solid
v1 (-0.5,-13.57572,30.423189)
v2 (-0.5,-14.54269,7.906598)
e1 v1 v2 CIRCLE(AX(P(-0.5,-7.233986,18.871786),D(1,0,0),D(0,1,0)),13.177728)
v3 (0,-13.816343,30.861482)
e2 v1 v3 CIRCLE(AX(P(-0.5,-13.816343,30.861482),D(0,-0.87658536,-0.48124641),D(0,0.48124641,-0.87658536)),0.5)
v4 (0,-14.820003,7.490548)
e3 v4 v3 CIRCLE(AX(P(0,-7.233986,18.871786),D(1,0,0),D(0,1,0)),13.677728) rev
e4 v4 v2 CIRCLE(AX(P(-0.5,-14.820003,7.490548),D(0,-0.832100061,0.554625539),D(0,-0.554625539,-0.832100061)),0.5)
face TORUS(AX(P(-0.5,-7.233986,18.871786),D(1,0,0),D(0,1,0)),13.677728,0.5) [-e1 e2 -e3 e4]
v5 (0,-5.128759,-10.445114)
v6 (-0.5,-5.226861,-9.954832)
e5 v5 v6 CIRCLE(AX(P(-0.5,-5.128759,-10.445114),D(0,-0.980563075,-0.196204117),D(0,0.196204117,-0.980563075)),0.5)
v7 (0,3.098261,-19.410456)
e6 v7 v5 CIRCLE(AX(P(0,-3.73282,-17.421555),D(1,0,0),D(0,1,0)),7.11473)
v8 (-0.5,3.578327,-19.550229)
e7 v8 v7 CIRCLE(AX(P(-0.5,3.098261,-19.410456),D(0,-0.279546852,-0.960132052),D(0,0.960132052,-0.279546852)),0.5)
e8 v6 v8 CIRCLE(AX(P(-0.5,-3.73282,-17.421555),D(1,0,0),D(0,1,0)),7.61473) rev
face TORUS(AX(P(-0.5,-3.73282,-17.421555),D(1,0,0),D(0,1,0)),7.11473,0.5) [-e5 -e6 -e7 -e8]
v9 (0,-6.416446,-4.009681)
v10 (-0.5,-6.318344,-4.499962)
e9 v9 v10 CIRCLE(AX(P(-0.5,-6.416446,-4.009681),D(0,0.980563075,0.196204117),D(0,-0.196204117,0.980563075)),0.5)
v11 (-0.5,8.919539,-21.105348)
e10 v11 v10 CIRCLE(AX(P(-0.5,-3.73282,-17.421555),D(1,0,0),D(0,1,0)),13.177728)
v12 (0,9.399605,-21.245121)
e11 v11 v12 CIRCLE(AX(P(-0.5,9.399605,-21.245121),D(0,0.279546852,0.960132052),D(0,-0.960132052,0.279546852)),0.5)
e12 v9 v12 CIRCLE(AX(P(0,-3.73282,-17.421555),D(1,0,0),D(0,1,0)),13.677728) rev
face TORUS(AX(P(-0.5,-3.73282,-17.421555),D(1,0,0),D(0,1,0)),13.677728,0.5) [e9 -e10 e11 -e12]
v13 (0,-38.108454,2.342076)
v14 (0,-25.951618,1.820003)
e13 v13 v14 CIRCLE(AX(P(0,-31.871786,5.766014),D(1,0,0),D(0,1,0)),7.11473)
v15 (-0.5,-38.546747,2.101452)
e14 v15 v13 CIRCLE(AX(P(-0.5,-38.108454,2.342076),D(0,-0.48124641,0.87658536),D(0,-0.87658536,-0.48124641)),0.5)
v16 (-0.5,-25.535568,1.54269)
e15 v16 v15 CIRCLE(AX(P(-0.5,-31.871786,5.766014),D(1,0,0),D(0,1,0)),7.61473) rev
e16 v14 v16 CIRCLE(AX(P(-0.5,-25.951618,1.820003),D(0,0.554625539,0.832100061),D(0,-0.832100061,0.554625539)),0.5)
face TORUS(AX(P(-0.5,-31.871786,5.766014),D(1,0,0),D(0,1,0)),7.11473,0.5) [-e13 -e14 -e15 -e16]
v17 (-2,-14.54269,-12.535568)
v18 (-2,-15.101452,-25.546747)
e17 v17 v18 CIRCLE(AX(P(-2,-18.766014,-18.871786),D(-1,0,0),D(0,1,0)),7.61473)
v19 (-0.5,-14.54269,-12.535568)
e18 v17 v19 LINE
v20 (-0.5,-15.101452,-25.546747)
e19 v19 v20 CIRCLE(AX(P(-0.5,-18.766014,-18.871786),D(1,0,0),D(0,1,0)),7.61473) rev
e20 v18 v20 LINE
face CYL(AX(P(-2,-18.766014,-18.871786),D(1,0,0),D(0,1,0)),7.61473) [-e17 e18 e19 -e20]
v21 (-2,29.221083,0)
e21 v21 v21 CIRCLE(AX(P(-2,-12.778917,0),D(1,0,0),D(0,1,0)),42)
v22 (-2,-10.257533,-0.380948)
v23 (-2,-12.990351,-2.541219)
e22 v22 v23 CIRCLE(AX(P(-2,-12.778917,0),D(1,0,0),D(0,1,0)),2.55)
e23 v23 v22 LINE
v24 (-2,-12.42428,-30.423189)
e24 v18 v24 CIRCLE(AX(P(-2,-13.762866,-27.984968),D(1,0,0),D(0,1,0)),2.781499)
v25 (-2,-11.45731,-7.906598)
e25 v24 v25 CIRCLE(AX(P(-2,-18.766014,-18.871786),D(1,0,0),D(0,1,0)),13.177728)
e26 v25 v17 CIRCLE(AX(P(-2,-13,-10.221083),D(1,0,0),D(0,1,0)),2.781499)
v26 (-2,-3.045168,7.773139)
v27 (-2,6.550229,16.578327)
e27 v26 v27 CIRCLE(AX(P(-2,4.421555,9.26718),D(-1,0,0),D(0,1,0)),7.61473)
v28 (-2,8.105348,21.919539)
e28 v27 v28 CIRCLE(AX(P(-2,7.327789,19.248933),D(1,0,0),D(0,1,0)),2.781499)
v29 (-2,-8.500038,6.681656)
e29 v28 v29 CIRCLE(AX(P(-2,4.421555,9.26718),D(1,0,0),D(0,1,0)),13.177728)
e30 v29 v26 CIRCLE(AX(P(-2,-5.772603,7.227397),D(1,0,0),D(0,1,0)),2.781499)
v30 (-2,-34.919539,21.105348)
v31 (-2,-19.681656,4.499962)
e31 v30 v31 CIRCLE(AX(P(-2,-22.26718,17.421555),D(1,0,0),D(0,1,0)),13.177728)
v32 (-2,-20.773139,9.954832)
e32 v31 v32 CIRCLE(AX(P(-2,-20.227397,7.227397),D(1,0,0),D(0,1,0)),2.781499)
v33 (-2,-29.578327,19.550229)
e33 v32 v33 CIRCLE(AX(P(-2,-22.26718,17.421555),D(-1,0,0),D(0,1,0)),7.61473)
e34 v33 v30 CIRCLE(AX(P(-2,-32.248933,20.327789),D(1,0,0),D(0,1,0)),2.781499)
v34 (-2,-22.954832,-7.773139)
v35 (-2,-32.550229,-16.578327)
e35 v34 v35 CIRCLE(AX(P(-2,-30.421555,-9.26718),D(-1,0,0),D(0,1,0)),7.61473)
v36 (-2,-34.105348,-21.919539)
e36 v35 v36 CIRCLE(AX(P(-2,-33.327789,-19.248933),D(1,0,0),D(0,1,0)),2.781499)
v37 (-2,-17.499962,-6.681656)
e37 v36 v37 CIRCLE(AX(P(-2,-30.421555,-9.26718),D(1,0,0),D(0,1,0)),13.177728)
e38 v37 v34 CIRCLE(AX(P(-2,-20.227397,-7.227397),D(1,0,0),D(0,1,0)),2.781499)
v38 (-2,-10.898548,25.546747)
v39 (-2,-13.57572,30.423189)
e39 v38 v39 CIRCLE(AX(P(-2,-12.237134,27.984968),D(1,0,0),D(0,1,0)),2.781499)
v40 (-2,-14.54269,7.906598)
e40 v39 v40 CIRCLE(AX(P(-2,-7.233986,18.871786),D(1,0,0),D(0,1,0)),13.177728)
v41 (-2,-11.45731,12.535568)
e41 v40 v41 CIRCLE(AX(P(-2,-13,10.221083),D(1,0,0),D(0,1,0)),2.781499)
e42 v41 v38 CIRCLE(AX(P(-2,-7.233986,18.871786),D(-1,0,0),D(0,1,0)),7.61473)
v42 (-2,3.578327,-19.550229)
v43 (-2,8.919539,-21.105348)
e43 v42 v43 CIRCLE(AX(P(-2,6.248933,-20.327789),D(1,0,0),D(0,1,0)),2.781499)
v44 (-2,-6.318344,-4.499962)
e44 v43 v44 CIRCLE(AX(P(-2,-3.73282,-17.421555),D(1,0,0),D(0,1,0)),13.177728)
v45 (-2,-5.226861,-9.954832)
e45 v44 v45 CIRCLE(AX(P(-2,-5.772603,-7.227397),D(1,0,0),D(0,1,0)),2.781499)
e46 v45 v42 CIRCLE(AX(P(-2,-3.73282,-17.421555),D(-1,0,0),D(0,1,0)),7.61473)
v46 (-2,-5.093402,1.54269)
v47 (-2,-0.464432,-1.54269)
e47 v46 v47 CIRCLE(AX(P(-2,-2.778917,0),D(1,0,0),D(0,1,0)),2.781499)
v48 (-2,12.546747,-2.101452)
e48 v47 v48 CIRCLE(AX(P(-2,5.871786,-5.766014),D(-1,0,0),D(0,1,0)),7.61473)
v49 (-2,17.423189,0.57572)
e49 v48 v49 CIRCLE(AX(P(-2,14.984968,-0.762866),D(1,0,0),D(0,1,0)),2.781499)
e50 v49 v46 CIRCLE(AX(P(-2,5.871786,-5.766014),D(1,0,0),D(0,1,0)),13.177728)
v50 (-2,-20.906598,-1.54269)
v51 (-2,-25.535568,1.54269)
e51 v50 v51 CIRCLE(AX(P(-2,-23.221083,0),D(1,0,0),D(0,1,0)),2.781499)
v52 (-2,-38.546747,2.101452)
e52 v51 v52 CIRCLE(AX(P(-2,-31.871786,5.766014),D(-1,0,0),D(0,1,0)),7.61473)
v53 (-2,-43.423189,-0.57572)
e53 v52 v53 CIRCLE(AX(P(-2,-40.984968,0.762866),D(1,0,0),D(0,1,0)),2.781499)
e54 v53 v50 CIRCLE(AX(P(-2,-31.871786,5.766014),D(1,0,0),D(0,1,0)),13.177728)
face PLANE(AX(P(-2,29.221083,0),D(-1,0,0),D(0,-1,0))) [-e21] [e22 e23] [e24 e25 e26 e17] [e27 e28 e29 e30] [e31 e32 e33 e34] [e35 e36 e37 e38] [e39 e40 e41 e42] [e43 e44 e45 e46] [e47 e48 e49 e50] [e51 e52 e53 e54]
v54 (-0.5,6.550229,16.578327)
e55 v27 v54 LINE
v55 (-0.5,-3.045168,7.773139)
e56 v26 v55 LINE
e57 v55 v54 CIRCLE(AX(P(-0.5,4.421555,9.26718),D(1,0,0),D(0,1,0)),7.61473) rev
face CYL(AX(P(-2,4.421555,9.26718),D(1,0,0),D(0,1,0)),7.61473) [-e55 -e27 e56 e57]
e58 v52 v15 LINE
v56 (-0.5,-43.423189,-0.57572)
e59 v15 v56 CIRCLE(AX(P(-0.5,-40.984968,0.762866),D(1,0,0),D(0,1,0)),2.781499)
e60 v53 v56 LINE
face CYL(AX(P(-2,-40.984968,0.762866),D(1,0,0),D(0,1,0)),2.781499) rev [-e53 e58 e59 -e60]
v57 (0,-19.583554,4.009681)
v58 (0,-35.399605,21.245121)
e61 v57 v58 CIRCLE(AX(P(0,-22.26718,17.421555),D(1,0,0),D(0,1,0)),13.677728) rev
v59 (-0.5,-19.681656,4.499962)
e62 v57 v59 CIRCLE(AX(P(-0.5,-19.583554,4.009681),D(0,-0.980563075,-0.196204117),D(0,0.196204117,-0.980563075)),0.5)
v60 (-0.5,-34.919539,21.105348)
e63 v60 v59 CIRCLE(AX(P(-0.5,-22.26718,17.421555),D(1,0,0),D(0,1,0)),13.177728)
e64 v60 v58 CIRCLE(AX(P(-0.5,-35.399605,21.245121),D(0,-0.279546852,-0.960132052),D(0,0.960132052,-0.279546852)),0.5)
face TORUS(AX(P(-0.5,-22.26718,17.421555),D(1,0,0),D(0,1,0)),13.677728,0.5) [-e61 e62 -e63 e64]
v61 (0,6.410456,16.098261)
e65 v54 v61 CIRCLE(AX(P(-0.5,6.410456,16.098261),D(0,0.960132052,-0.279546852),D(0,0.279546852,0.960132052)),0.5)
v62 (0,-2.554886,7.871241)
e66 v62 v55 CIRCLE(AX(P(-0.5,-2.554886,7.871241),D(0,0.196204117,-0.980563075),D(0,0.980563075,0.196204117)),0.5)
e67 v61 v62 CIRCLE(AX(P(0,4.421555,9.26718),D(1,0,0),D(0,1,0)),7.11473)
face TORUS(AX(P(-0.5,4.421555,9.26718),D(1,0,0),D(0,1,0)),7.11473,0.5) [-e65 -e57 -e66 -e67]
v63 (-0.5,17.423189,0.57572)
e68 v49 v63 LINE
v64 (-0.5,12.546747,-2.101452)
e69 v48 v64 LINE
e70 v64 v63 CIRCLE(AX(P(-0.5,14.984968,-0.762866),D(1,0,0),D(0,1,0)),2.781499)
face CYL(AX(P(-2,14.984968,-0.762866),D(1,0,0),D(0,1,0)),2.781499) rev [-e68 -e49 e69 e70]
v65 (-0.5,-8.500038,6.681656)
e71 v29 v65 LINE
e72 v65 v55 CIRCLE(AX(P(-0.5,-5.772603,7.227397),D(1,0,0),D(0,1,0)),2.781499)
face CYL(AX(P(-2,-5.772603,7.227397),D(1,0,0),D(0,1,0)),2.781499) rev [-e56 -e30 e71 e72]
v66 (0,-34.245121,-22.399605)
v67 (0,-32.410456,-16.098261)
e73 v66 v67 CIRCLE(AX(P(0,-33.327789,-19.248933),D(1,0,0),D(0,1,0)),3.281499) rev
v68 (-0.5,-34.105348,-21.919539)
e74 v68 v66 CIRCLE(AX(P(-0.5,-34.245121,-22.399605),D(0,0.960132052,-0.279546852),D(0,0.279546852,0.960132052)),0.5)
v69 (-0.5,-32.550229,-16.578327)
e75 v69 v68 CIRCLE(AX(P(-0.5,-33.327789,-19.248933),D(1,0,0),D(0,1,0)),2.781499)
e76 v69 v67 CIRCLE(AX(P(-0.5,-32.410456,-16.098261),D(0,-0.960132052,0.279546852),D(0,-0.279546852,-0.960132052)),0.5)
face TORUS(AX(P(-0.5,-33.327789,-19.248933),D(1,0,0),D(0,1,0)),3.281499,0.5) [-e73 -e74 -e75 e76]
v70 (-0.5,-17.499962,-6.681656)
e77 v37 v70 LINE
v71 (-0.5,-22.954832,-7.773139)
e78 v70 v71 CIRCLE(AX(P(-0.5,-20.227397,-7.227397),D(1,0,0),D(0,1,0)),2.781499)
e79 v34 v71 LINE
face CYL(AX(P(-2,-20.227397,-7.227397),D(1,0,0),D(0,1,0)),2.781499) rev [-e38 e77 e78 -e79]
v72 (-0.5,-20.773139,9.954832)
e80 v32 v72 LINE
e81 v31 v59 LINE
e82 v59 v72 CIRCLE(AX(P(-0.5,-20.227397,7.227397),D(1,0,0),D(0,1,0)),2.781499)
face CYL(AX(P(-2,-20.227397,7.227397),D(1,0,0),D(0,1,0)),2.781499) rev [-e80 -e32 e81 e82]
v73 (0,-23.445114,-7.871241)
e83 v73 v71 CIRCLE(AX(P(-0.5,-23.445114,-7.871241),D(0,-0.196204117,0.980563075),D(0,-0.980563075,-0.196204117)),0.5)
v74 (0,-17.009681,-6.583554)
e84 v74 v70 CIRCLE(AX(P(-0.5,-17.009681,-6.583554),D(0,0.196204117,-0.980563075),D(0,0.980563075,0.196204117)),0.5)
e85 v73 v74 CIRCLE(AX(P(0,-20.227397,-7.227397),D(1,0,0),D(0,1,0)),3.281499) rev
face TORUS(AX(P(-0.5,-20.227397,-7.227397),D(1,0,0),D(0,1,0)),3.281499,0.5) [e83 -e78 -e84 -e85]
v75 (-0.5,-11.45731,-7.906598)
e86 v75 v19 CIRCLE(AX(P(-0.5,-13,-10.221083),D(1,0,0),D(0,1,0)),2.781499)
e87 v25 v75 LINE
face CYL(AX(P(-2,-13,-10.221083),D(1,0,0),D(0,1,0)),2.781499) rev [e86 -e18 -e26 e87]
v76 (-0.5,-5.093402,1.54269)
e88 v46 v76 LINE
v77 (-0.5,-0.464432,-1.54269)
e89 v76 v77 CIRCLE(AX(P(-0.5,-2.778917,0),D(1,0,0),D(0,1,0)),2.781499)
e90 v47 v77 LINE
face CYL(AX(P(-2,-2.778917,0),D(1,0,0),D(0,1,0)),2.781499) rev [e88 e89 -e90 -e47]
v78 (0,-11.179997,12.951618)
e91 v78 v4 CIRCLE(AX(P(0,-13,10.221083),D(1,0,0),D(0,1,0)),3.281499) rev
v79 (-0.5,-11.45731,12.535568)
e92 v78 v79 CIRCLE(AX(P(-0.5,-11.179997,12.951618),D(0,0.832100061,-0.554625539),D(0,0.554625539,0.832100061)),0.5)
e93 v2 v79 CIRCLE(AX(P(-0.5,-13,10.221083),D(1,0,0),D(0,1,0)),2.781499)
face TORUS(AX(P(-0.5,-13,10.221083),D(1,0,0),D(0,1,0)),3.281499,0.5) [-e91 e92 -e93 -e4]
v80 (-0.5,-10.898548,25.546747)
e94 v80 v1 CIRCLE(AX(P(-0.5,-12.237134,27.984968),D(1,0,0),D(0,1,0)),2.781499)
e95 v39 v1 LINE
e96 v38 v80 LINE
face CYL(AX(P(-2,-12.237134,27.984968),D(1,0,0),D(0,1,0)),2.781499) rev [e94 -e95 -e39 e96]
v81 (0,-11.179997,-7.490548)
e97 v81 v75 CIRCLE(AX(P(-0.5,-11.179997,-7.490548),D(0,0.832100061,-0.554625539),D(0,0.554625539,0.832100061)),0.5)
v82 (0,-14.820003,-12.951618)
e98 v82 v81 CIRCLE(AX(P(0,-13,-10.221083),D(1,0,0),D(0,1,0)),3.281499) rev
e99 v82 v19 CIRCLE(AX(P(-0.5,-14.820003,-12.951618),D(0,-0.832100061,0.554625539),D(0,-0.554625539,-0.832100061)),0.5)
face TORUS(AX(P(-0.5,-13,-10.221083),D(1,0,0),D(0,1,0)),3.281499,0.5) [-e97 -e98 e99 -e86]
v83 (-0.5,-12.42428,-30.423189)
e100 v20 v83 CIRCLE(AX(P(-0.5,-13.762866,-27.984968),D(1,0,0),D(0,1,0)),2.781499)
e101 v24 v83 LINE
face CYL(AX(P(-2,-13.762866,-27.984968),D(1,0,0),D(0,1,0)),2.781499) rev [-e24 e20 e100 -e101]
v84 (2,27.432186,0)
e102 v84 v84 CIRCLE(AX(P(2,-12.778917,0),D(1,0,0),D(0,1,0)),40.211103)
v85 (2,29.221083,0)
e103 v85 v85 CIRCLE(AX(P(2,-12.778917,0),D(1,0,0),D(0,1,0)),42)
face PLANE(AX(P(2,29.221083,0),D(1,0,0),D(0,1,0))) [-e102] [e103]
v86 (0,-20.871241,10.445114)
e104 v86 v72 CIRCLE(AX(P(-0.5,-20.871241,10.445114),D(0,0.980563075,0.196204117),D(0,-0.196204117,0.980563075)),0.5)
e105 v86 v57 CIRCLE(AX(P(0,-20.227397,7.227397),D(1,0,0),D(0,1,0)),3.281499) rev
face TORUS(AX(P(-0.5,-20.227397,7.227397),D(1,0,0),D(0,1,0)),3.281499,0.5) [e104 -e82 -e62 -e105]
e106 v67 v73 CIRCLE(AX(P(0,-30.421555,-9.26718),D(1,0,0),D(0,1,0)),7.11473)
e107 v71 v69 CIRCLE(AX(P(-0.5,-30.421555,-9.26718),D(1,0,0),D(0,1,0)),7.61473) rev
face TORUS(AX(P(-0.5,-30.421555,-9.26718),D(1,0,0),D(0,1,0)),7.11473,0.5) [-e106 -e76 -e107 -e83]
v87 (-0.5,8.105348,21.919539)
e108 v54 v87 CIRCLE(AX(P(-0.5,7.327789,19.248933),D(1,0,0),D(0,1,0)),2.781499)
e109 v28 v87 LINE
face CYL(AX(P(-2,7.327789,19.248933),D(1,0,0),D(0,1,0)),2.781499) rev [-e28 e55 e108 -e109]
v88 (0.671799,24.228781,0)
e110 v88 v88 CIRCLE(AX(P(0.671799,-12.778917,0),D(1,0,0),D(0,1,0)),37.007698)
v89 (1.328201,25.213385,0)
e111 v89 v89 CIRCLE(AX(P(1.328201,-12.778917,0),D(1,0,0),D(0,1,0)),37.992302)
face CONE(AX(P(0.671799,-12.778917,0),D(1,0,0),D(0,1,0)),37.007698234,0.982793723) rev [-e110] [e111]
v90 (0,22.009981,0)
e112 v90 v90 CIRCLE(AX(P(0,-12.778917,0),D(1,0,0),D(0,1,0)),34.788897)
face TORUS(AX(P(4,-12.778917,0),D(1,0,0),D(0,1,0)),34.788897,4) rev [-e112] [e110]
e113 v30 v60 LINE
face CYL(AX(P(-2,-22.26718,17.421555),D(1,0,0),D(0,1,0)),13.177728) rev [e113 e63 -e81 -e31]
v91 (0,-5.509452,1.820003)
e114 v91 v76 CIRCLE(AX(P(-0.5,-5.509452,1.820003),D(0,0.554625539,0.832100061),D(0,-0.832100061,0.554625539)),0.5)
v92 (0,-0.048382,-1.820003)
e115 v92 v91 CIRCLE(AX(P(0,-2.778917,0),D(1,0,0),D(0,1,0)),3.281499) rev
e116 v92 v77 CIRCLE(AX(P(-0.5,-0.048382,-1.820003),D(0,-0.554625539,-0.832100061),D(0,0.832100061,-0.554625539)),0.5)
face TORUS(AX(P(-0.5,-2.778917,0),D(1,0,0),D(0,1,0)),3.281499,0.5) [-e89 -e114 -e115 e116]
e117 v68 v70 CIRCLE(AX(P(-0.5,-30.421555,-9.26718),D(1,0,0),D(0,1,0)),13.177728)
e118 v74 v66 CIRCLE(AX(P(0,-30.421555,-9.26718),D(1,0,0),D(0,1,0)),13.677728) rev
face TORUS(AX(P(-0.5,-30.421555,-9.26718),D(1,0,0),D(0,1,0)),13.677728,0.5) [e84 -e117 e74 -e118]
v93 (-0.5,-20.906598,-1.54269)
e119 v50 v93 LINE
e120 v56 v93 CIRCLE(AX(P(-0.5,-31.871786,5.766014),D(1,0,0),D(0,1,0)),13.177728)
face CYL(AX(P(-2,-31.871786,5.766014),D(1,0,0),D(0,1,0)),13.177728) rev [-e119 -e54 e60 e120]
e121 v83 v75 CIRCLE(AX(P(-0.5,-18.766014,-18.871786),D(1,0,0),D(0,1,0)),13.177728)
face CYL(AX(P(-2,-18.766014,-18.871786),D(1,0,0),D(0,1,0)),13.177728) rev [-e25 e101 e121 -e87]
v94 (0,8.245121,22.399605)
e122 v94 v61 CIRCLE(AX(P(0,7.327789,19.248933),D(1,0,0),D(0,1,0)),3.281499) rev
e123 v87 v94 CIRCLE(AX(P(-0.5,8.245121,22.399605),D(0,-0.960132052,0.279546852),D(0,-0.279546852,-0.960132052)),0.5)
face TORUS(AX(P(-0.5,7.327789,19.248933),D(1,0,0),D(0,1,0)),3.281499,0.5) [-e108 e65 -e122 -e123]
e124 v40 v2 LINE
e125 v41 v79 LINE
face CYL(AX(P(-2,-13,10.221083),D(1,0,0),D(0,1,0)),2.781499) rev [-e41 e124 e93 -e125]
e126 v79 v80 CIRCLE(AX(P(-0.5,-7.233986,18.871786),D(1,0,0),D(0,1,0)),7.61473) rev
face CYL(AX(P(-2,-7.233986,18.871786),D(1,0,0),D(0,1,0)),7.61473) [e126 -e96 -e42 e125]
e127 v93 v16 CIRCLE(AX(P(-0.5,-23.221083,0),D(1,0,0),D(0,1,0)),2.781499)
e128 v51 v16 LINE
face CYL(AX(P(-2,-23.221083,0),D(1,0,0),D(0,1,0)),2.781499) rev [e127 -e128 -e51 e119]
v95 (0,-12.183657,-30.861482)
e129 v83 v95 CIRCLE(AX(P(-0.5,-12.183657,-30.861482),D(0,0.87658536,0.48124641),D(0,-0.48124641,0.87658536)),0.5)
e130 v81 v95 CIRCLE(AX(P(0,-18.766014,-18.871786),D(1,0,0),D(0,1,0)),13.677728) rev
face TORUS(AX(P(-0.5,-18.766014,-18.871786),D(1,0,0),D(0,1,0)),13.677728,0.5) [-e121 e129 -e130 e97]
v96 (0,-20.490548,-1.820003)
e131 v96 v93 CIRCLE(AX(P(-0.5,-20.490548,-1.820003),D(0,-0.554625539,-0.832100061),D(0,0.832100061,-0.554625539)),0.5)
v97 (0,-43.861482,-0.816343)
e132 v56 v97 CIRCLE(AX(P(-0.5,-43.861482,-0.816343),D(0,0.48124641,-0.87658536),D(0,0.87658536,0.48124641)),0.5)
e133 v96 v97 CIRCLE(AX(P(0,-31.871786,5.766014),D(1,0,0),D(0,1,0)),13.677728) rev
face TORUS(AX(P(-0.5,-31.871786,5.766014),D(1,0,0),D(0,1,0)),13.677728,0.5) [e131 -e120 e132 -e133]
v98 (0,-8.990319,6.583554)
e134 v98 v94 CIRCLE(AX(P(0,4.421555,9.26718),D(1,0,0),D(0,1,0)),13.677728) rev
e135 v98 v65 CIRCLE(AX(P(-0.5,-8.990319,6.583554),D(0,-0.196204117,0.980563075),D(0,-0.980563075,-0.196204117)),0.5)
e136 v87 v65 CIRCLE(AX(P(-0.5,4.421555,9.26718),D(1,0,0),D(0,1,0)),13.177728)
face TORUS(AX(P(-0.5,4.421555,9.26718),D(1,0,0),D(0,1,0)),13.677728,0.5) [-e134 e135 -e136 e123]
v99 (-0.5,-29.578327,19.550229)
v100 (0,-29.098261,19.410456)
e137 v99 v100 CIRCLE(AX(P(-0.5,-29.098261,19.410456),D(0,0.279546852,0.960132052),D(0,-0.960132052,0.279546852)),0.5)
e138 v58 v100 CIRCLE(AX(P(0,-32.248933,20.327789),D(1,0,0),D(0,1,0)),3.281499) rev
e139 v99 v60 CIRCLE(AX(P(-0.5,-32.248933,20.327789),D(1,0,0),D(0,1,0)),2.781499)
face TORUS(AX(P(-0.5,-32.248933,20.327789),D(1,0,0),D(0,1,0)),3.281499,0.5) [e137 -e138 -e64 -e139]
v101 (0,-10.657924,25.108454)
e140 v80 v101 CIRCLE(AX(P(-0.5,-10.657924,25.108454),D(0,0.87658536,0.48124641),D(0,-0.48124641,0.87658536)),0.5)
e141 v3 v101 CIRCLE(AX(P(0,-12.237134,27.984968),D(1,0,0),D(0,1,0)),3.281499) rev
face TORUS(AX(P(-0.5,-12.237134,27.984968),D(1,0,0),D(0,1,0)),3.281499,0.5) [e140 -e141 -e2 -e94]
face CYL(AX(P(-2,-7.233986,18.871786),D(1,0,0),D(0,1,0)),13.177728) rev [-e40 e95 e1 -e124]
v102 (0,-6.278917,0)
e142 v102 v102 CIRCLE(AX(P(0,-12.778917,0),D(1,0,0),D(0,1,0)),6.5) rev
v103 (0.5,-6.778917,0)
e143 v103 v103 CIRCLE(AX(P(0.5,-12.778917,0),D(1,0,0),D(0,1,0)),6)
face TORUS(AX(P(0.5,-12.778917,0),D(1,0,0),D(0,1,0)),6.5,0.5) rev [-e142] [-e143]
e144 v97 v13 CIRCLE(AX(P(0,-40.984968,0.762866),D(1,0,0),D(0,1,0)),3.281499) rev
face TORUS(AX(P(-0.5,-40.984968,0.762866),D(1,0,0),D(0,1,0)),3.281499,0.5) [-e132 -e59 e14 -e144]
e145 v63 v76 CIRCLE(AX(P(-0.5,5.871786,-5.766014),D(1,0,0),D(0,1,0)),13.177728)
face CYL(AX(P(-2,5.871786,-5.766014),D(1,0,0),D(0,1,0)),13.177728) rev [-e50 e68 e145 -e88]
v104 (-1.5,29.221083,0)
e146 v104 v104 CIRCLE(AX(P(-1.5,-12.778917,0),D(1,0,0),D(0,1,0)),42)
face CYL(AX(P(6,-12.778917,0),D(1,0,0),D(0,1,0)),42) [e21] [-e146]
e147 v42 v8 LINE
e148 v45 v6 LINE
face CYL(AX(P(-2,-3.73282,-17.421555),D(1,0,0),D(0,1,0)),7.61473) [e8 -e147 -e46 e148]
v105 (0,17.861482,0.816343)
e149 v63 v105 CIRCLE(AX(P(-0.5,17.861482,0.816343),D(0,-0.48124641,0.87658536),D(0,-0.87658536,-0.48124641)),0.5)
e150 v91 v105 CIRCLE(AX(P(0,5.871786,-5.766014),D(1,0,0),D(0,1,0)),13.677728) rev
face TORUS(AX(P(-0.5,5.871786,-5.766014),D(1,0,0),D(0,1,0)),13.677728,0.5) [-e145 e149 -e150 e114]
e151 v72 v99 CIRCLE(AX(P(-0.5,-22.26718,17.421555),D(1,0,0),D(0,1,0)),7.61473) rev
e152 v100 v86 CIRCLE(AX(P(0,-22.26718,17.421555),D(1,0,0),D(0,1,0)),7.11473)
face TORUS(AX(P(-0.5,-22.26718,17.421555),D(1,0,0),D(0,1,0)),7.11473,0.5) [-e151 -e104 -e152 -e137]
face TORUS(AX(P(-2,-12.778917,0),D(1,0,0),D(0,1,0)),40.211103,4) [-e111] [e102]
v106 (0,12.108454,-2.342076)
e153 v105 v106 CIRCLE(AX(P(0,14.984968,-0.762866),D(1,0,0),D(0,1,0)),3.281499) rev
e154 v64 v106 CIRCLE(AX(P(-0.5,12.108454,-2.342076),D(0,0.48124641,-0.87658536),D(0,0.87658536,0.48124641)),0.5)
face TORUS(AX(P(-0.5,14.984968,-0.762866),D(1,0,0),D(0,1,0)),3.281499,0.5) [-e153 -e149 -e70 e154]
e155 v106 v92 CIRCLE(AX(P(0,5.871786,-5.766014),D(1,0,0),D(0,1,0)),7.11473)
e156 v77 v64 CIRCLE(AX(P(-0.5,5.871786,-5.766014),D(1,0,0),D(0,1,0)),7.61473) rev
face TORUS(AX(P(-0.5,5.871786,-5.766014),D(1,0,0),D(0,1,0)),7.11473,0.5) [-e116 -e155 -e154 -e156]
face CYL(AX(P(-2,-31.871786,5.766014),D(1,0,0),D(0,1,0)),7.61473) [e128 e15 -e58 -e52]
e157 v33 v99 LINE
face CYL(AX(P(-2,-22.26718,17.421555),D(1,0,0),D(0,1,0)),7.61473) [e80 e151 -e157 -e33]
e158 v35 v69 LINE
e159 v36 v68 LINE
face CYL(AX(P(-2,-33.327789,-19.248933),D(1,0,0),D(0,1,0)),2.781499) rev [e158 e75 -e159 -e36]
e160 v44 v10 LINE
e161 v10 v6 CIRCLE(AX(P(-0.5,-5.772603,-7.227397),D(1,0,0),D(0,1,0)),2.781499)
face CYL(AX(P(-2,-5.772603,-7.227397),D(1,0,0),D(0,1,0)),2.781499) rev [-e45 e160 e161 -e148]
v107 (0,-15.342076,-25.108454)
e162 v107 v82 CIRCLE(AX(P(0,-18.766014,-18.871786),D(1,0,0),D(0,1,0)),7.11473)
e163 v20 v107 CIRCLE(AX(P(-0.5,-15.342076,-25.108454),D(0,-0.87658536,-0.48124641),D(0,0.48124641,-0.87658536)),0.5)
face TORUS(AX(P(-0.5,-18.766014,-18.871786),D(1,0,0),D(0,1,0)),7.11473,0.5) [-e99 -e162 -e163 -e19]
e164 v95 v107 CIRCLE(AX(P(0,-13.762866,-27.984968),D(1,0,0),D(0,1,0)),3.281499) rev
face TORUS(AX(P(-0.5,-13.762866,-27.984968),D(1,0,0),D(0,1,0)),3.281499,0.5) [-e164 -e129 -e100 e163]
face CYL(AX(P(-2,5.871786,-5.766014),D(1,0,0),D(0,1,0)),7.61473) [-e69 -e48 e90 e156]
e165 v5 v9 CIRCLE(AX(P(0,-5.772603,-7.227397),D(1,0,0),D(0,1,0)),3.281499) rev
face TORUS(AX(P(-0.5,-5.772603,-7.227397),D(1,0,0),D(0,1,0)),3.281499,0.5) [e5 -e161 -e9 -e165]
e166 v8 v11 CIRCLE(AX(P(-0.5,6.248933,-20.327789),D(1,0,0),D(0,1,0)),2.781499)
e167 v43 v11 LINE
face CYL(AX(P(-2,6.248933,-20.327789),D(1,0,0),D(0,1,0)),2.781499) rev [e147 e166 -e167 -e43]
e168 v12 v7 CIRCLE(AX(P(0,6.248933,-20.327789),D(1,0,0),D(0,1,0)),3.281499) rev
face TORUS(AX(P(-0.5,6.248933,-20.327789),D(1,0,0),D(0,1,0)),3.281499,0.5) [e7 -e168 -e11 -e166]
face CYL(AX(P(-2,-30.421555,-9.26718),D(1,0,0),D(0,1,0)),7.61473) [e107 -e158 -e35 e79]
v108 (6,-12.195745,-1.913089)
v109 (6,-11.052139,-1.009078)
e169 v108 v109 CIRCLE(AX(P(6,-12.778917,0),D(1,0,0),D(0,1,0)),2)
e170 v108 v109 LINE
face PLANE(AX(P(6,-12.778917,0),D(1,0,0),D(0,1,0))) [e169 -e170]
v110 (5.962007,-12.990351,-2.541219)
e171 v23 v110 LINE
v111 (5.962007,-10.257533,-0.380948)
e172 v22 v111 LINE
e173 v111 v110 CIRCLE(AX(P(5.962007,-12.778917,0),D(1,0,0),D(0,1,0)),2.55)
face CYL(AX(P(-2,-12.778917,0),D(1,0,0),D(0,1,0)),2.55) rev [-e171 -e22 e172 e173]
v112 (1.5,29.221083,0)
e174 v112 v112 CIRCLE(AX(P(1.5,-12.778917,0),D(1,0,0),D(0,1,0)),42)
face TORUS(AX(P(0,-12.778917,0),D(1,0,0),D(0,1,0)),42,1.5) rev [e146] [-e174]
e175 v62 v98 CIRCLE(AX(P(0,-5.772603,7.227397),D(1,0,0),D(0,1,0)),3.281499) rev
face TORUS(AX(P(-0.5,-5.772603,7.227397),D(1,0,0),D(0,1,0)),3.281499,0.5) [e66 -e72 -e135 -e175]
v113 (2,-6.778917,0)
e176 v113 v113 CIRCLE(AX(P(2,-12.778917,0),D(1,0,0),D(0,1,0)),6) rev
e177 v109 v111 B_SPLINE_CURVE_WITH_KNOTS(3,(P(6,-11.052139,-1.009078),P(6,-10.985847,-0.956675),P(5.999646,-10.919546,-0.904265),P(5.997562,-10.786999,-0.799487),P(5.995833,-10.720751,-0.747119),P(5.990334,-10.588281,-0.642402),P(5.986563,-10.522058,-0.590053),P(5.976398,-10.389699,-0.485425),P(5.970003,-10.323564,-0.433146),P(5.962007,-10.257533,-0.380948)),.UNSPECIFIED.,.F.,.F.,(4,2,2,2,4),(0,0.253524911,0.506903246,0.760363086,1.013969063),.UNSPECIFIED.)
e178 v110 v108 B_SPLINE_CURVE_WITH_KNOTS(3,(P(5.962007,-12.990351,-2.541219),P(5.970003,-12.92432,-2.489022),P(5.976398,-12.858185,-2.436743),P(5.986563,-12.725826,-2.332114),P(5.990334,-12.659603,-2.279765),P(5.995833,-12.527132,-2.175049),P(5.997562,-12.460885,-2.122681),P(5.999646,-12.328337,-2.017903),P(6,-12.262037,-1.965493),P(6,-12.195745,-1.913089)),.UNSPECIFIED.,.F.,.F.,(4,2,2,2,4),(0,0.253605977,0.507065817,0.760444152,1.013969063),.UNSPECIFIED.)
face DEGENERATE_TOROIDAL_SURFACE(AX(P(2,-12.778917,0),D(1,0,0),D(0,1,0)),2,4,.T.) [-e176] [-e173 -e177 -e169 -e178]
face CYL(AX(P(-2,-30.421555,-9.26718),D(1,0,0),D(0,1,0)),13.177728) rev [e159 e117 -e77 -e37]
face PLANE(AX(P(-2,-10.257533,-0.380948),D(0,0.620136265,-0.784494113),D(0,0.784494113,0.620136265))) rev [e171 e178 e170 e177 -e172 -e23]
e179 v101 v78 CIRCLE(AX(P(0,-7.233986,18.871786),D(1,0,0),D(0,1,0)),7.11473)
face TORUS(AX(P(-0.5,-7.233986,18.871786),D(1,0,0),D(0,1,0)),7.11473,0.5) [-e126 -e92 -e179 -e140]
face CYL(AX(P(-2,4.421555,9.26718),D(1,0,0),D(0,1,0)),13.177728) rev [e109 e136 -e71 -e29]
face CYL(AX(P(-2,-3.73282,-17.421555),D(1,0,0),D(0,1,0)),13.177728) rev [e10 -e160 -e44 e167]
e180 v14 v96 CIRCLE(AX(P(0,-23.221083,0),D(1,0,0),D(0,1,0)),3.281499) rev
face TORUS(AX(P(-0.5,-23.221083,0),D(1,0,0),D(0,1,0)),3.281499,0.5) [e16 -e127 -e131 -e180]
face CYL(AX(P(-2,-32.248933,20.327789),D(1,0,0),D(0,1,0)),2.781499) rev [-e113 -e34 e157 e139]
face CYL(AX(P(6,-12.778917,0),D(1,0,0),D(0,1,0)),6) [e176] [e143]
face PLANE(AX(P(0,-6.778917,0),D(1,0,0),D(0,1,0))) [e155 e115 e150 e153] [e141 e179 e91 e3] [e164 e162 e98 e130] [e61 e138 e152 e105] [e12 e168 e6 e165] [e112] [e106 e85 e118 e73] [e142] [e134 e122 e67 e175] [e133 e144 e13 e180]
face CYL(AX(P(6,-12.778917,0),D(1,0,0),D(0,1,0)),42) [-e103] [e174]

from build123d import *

# Parameters (mm, degrees)
WYTNIJ_WYCI_GNI_CIE8_DEPTH = 70.489061928
WYTNIJ_WYCI_GNI_CIE9_DEPTH = 70.287298459
ZAOKR_GLENIE1_R            = 4
ZAOKR_GLENIE2_R            = 0.5


with BuildPart() as part:
    # Szkic1 → Obrót1 (revolve)
    with BuildSketch(Plane.XY):
        with BuildLine():
            Line((6, -12.778916817), (-2, -12.778916817))
            Line((-2, -12.778916817), (-2, 29.221083183))
            Line((-2, 29.221083183), (-1.5, 29.221083183))
            ThreePointArc((-1.5, 29.221083183), (0, 27.721083183), (1.5, 29.221083183))
            Line((1.5, 29.221083183), (2, 29.221083183))
            Line((2, 29.221083183), (2, 27.432185734))
            ThreePointArc((2, 27.432185734), (1.828368106, 26.273049139), (1.328201177, 25.213384949))
            Line((1.328201177, 25.213384949), (0.671798823, 24.228781417))
            ThreePointArc((0.671798823, 24.228781417), (0.171631894, 23.169117227), (0, 22.009980632))
            Line((0, 22.009980632), (0, -6.778916817))
            Line((0, -6.778916817), (6, -6.778916817))
            Line((6, -6.778916817), (6, -12.778916817))
        make_face()
    revolve(axis=Axis((6, -12.778916817, 0), (-1, 0, 0)))

    # Szkic4 → Wytnij-wyciągnięcie8 (cut, through all)
    with BuildSketch(Plane(origin=(6, 0, 0), x_dir=(0, 0, -1), z_dir=(1, 0, 0))):
        with BuildLine():
            Line((0.380948258, -10.257532589), (2.541219296, -12.990351177))
            ThreePointArc((2.541219296, -12.990351177), (-2.000459988, -14.360264293), (0.380948258, -10.257532589))
        make_face()
    extrude(amount=-WYTNIJ_WYCI_GNI_CIE8_DEPTH, mode=Mode.SUBTRACT)

    # Szkic5 → Wytnij-wyciągnięcie9 (cut, through all)
    with BuildSketch(Plane(origin=(0, 0, 0), x_dir=(0, 0, -1), z_dir=(1, 0, 0))):
        with BuildLine():
            ThreePointArc((-0.575720008, 17.423189035), (-7.399578746, 6.437179505), (-1.542690175, -5.093401996))
            ThreePointArc((-1.542690175, -5.093401996), (2.314485179, -4.321606992), (1.542690175, -0.464431639))
            ThreePointArc((1.542690175, -0.464431639), (-1.841704197, 6.198497775), (2.101452451, 12.546747084))
            ThreePointArc((2.101452451, 12.546747084), (3.201087197, 16.323554289), (-0.575720008, 17.423189035))
        make_face()
        with BuildLine():
            ThreePointArc((21.10534775, 8.919538793), (8.511869125, 5.976453744), (4.499962381, -6.318344251))
            ThreePointArc((4.499962381, -6.318344251), (7.77313871, -8.500037619), (9.954832078, -5.22686129))
            ThreePointArc((9.954832078, -5.22686129), (12.273106439, 1.877669493), (19.550229379, 3.578326822))
            ThreePointArc((19.550229379, 3.578326822), (22.99839455, 5.471373622), (21.10534775, 8.919538793))
        make_face()
        with BuildLine():
            ThreePointArc((30.423189035, -12.424279992), (19.437179505, -5.600421254), (7.906598004, -11.457309825))
            ThreePointArc((7.906598004, -11.457309825), (8.678393008, -15.314485179), (12.535568361, -14.542690175))
            ThreePointArc((12.535568361, -14.542690175), (19.198497775, -11.158295803), (25.546747084, -15.101452451))
            ThreePointArc((25.546747084, -15.101452451), (29.323554289, -16.201087197), (30.423189035, -12.424279992))
        make_face()
        with BuildLine():
            ThreePointArc((21.919538793, -34.10534775), (18.976453744, -21.511869125), (6.681655749, -17.499962381))
            ThreePointArc((6.681655749, -17.499962381), (4.499962381, -20.77313871), (7.77313871, -22.954832078))
            ThreePointArc((7.77313871, -22.954832078), (14.877669493, -25.273106439), (16.578326822, -32.550229379))
            ThreePointArc((16.578326822, -32.550229379), (18.471373622, -35.99839455), (21.919538793, -34.10534775))
        make_face()
        with BuildLine():
            ThreePointArc((0.575720008, -43.423189035), (7.399578746, -32.437179505), (1.542690175, -20.906598004))
            ThreePointArc((1.542690175, -20.906598004), (-2.314485179, -21.678393008), (-1.542690175, -25.535568361))
            ThreePointArc((-1.542690175, -25.535568361), (1.841704197, -32.198497775), (-2.101452451, -38.546747084))
            ThreePointArc((-2.101452451, -38.546747084), (-3.201087197, -42.323554289), (0.575720008, -43.423189035))
        make_face()
        with BuildLine():
            ThreePointArc((-21.10534775, -34.919538793), (-8.511869125, -31.976453744), (-4.499962381, -19.681655749))
            ThreePointArc((-4.499962381, -19.681655749), (-7.77313871, -17.499962381), (-9.954832078, -20.77313871))
            ThreePointArc((-9.954832078, -20.77313871), (-12.273106439, -27.877669493), (-19.550229379, -29.578326822))
            ThreePointArc((-19.550229379, -29.578326822), (-22.99839455, -31.471373622), (-21.10534775, -34.919538793))
        make_face()
        with BuildLine():
            ThreePointArc((-30.423189035, -13.575720008), (-19.437179505, -20.399578746), (-7.906598004, -14.542690175))
            ThreePointArc((-7.906598004, -14.542690175), (-8.678393008, -10.685514821), (-12.535568361, -11.457309825))
            ThreePointArc((-12.535568361, -11.457309825), (-19.198497775, -14.841704197), (-25.546747084, -10.898547549))
            ThreePointArc((-25.546747084, -10.898547549), (-29.323554289, -9.798912803), (-30.423189035, -13.575720008))
        make_face()
        with BuildLine():
            ThreePointArc((-21.919538793, 8.10534775), (-18.976453744, -4.488130875), (-6.681655749, -8.500037619))
            ThreePointArc((-6.681655749, -8.500037619), (-4.499962381, -5.22686129), (-7.77313871, -3.045167922))
            ThreePointArc((-7.77313871, -3.045167922), (-14.877669493, -0.726893561), (-16.578326822, 6.550229379))
            ThreePointArc((-16.578326822, 6.550229379), (-18.471373622, 9.99839455), (-21.919538793, 8.10534775))
        make_face()
    extrude(amount=-WYTNIJ_WYCI_GNI_CIE9_DEPTH, mode=Mode.SUBTRACT)

    # Zaokrąglenie1
    # the kernel refuses this fillet: 4 mm, written as the material it takes off along each edge
    with BuildSketch(Plane(origin=(6, -12.778916817, 0), x_dir=(0, 1, 0), z_dir=(0, 0, 1))) as zaokr_glenie1_piece_1:
        with BuildLine():
            CenterArc((6 - ZAOKR_GLENIE1_R, ZAOKR_GLENIE1_R), ZAOKR_GLENIE1_R, 270, 90)
            Line((6, ZAOKR_GLENIE1_R), (6, 0))
            Line((6, 0), (6 - ZAOKR_GLENIE1_R, 0))
        make_face()
    revolve(axis=Axis((6, -12.778916817, 0), (-1, 0, 0)), mode=Mode.SUBTRACT)

    # Zaokrąglenie2
    zaokr_glenie2_edges = [part.edges().sort_by_distance(p)[0] for p in [
        (0, -31.471373622, 22.99839455),
        (0, -31.976453744, 8.511869125),
        (0, -17.499962381, 7.77313871),
        (0, -27.877669493, 12.273106439),
        (0, -9.798912803, 29.323554289),
        (0, -20.399578746, 19.437179505),
        (0, -10.685514821, 8.678393008),
        (0, -14.841704197, 19.198497775),
        (0, 9.99839455, 18.471373622),
        (0, -4.488130875, 18.976453744),
        (0, -5.22686129, 4.499962381),
        (0, -0.726893561, 14.877669493),
        (0, 16.323554289, -3.201087197),
        (0, 6.437179505, 7.399578746),
        (0, -4.321606992, -2.314485179),
        (0, 6.198497775, 1.841704197),
        (0, 5.471373622, -22.99839455),
        (0, 5.976453744, -8.511869125),
        (0, -8.500037619, -7.77313871),
        (0, 1.877669493, -12.273106439),
        (0, -16.201087197, -29.323554289),
        (0, -5.600421254, -19.437179505),
        (0, -15.314485179, -8.678393008),
        (0, -11.158295803, -19.198497775),
        (0, -35.99839455, -18.471373622),
        (0, -21.511869125, -18.976453744),
        (0, -20.77313871, -4.499962381),
        (0, -25.273106439, -14.877669493),
        (0, -18.778916817, 0),
        (0, -42.323554289, 3.201087197),
        (0, -32.437179505, -7.399578746),
        (0, -21.678393008, 2.314485179),
        (0, -32.198497775, -1.841704197),
    ]]
    fillet(zaokr_glenie2_edges, radius=ZAOKR_GLENIE2_R)


solid = part.part
